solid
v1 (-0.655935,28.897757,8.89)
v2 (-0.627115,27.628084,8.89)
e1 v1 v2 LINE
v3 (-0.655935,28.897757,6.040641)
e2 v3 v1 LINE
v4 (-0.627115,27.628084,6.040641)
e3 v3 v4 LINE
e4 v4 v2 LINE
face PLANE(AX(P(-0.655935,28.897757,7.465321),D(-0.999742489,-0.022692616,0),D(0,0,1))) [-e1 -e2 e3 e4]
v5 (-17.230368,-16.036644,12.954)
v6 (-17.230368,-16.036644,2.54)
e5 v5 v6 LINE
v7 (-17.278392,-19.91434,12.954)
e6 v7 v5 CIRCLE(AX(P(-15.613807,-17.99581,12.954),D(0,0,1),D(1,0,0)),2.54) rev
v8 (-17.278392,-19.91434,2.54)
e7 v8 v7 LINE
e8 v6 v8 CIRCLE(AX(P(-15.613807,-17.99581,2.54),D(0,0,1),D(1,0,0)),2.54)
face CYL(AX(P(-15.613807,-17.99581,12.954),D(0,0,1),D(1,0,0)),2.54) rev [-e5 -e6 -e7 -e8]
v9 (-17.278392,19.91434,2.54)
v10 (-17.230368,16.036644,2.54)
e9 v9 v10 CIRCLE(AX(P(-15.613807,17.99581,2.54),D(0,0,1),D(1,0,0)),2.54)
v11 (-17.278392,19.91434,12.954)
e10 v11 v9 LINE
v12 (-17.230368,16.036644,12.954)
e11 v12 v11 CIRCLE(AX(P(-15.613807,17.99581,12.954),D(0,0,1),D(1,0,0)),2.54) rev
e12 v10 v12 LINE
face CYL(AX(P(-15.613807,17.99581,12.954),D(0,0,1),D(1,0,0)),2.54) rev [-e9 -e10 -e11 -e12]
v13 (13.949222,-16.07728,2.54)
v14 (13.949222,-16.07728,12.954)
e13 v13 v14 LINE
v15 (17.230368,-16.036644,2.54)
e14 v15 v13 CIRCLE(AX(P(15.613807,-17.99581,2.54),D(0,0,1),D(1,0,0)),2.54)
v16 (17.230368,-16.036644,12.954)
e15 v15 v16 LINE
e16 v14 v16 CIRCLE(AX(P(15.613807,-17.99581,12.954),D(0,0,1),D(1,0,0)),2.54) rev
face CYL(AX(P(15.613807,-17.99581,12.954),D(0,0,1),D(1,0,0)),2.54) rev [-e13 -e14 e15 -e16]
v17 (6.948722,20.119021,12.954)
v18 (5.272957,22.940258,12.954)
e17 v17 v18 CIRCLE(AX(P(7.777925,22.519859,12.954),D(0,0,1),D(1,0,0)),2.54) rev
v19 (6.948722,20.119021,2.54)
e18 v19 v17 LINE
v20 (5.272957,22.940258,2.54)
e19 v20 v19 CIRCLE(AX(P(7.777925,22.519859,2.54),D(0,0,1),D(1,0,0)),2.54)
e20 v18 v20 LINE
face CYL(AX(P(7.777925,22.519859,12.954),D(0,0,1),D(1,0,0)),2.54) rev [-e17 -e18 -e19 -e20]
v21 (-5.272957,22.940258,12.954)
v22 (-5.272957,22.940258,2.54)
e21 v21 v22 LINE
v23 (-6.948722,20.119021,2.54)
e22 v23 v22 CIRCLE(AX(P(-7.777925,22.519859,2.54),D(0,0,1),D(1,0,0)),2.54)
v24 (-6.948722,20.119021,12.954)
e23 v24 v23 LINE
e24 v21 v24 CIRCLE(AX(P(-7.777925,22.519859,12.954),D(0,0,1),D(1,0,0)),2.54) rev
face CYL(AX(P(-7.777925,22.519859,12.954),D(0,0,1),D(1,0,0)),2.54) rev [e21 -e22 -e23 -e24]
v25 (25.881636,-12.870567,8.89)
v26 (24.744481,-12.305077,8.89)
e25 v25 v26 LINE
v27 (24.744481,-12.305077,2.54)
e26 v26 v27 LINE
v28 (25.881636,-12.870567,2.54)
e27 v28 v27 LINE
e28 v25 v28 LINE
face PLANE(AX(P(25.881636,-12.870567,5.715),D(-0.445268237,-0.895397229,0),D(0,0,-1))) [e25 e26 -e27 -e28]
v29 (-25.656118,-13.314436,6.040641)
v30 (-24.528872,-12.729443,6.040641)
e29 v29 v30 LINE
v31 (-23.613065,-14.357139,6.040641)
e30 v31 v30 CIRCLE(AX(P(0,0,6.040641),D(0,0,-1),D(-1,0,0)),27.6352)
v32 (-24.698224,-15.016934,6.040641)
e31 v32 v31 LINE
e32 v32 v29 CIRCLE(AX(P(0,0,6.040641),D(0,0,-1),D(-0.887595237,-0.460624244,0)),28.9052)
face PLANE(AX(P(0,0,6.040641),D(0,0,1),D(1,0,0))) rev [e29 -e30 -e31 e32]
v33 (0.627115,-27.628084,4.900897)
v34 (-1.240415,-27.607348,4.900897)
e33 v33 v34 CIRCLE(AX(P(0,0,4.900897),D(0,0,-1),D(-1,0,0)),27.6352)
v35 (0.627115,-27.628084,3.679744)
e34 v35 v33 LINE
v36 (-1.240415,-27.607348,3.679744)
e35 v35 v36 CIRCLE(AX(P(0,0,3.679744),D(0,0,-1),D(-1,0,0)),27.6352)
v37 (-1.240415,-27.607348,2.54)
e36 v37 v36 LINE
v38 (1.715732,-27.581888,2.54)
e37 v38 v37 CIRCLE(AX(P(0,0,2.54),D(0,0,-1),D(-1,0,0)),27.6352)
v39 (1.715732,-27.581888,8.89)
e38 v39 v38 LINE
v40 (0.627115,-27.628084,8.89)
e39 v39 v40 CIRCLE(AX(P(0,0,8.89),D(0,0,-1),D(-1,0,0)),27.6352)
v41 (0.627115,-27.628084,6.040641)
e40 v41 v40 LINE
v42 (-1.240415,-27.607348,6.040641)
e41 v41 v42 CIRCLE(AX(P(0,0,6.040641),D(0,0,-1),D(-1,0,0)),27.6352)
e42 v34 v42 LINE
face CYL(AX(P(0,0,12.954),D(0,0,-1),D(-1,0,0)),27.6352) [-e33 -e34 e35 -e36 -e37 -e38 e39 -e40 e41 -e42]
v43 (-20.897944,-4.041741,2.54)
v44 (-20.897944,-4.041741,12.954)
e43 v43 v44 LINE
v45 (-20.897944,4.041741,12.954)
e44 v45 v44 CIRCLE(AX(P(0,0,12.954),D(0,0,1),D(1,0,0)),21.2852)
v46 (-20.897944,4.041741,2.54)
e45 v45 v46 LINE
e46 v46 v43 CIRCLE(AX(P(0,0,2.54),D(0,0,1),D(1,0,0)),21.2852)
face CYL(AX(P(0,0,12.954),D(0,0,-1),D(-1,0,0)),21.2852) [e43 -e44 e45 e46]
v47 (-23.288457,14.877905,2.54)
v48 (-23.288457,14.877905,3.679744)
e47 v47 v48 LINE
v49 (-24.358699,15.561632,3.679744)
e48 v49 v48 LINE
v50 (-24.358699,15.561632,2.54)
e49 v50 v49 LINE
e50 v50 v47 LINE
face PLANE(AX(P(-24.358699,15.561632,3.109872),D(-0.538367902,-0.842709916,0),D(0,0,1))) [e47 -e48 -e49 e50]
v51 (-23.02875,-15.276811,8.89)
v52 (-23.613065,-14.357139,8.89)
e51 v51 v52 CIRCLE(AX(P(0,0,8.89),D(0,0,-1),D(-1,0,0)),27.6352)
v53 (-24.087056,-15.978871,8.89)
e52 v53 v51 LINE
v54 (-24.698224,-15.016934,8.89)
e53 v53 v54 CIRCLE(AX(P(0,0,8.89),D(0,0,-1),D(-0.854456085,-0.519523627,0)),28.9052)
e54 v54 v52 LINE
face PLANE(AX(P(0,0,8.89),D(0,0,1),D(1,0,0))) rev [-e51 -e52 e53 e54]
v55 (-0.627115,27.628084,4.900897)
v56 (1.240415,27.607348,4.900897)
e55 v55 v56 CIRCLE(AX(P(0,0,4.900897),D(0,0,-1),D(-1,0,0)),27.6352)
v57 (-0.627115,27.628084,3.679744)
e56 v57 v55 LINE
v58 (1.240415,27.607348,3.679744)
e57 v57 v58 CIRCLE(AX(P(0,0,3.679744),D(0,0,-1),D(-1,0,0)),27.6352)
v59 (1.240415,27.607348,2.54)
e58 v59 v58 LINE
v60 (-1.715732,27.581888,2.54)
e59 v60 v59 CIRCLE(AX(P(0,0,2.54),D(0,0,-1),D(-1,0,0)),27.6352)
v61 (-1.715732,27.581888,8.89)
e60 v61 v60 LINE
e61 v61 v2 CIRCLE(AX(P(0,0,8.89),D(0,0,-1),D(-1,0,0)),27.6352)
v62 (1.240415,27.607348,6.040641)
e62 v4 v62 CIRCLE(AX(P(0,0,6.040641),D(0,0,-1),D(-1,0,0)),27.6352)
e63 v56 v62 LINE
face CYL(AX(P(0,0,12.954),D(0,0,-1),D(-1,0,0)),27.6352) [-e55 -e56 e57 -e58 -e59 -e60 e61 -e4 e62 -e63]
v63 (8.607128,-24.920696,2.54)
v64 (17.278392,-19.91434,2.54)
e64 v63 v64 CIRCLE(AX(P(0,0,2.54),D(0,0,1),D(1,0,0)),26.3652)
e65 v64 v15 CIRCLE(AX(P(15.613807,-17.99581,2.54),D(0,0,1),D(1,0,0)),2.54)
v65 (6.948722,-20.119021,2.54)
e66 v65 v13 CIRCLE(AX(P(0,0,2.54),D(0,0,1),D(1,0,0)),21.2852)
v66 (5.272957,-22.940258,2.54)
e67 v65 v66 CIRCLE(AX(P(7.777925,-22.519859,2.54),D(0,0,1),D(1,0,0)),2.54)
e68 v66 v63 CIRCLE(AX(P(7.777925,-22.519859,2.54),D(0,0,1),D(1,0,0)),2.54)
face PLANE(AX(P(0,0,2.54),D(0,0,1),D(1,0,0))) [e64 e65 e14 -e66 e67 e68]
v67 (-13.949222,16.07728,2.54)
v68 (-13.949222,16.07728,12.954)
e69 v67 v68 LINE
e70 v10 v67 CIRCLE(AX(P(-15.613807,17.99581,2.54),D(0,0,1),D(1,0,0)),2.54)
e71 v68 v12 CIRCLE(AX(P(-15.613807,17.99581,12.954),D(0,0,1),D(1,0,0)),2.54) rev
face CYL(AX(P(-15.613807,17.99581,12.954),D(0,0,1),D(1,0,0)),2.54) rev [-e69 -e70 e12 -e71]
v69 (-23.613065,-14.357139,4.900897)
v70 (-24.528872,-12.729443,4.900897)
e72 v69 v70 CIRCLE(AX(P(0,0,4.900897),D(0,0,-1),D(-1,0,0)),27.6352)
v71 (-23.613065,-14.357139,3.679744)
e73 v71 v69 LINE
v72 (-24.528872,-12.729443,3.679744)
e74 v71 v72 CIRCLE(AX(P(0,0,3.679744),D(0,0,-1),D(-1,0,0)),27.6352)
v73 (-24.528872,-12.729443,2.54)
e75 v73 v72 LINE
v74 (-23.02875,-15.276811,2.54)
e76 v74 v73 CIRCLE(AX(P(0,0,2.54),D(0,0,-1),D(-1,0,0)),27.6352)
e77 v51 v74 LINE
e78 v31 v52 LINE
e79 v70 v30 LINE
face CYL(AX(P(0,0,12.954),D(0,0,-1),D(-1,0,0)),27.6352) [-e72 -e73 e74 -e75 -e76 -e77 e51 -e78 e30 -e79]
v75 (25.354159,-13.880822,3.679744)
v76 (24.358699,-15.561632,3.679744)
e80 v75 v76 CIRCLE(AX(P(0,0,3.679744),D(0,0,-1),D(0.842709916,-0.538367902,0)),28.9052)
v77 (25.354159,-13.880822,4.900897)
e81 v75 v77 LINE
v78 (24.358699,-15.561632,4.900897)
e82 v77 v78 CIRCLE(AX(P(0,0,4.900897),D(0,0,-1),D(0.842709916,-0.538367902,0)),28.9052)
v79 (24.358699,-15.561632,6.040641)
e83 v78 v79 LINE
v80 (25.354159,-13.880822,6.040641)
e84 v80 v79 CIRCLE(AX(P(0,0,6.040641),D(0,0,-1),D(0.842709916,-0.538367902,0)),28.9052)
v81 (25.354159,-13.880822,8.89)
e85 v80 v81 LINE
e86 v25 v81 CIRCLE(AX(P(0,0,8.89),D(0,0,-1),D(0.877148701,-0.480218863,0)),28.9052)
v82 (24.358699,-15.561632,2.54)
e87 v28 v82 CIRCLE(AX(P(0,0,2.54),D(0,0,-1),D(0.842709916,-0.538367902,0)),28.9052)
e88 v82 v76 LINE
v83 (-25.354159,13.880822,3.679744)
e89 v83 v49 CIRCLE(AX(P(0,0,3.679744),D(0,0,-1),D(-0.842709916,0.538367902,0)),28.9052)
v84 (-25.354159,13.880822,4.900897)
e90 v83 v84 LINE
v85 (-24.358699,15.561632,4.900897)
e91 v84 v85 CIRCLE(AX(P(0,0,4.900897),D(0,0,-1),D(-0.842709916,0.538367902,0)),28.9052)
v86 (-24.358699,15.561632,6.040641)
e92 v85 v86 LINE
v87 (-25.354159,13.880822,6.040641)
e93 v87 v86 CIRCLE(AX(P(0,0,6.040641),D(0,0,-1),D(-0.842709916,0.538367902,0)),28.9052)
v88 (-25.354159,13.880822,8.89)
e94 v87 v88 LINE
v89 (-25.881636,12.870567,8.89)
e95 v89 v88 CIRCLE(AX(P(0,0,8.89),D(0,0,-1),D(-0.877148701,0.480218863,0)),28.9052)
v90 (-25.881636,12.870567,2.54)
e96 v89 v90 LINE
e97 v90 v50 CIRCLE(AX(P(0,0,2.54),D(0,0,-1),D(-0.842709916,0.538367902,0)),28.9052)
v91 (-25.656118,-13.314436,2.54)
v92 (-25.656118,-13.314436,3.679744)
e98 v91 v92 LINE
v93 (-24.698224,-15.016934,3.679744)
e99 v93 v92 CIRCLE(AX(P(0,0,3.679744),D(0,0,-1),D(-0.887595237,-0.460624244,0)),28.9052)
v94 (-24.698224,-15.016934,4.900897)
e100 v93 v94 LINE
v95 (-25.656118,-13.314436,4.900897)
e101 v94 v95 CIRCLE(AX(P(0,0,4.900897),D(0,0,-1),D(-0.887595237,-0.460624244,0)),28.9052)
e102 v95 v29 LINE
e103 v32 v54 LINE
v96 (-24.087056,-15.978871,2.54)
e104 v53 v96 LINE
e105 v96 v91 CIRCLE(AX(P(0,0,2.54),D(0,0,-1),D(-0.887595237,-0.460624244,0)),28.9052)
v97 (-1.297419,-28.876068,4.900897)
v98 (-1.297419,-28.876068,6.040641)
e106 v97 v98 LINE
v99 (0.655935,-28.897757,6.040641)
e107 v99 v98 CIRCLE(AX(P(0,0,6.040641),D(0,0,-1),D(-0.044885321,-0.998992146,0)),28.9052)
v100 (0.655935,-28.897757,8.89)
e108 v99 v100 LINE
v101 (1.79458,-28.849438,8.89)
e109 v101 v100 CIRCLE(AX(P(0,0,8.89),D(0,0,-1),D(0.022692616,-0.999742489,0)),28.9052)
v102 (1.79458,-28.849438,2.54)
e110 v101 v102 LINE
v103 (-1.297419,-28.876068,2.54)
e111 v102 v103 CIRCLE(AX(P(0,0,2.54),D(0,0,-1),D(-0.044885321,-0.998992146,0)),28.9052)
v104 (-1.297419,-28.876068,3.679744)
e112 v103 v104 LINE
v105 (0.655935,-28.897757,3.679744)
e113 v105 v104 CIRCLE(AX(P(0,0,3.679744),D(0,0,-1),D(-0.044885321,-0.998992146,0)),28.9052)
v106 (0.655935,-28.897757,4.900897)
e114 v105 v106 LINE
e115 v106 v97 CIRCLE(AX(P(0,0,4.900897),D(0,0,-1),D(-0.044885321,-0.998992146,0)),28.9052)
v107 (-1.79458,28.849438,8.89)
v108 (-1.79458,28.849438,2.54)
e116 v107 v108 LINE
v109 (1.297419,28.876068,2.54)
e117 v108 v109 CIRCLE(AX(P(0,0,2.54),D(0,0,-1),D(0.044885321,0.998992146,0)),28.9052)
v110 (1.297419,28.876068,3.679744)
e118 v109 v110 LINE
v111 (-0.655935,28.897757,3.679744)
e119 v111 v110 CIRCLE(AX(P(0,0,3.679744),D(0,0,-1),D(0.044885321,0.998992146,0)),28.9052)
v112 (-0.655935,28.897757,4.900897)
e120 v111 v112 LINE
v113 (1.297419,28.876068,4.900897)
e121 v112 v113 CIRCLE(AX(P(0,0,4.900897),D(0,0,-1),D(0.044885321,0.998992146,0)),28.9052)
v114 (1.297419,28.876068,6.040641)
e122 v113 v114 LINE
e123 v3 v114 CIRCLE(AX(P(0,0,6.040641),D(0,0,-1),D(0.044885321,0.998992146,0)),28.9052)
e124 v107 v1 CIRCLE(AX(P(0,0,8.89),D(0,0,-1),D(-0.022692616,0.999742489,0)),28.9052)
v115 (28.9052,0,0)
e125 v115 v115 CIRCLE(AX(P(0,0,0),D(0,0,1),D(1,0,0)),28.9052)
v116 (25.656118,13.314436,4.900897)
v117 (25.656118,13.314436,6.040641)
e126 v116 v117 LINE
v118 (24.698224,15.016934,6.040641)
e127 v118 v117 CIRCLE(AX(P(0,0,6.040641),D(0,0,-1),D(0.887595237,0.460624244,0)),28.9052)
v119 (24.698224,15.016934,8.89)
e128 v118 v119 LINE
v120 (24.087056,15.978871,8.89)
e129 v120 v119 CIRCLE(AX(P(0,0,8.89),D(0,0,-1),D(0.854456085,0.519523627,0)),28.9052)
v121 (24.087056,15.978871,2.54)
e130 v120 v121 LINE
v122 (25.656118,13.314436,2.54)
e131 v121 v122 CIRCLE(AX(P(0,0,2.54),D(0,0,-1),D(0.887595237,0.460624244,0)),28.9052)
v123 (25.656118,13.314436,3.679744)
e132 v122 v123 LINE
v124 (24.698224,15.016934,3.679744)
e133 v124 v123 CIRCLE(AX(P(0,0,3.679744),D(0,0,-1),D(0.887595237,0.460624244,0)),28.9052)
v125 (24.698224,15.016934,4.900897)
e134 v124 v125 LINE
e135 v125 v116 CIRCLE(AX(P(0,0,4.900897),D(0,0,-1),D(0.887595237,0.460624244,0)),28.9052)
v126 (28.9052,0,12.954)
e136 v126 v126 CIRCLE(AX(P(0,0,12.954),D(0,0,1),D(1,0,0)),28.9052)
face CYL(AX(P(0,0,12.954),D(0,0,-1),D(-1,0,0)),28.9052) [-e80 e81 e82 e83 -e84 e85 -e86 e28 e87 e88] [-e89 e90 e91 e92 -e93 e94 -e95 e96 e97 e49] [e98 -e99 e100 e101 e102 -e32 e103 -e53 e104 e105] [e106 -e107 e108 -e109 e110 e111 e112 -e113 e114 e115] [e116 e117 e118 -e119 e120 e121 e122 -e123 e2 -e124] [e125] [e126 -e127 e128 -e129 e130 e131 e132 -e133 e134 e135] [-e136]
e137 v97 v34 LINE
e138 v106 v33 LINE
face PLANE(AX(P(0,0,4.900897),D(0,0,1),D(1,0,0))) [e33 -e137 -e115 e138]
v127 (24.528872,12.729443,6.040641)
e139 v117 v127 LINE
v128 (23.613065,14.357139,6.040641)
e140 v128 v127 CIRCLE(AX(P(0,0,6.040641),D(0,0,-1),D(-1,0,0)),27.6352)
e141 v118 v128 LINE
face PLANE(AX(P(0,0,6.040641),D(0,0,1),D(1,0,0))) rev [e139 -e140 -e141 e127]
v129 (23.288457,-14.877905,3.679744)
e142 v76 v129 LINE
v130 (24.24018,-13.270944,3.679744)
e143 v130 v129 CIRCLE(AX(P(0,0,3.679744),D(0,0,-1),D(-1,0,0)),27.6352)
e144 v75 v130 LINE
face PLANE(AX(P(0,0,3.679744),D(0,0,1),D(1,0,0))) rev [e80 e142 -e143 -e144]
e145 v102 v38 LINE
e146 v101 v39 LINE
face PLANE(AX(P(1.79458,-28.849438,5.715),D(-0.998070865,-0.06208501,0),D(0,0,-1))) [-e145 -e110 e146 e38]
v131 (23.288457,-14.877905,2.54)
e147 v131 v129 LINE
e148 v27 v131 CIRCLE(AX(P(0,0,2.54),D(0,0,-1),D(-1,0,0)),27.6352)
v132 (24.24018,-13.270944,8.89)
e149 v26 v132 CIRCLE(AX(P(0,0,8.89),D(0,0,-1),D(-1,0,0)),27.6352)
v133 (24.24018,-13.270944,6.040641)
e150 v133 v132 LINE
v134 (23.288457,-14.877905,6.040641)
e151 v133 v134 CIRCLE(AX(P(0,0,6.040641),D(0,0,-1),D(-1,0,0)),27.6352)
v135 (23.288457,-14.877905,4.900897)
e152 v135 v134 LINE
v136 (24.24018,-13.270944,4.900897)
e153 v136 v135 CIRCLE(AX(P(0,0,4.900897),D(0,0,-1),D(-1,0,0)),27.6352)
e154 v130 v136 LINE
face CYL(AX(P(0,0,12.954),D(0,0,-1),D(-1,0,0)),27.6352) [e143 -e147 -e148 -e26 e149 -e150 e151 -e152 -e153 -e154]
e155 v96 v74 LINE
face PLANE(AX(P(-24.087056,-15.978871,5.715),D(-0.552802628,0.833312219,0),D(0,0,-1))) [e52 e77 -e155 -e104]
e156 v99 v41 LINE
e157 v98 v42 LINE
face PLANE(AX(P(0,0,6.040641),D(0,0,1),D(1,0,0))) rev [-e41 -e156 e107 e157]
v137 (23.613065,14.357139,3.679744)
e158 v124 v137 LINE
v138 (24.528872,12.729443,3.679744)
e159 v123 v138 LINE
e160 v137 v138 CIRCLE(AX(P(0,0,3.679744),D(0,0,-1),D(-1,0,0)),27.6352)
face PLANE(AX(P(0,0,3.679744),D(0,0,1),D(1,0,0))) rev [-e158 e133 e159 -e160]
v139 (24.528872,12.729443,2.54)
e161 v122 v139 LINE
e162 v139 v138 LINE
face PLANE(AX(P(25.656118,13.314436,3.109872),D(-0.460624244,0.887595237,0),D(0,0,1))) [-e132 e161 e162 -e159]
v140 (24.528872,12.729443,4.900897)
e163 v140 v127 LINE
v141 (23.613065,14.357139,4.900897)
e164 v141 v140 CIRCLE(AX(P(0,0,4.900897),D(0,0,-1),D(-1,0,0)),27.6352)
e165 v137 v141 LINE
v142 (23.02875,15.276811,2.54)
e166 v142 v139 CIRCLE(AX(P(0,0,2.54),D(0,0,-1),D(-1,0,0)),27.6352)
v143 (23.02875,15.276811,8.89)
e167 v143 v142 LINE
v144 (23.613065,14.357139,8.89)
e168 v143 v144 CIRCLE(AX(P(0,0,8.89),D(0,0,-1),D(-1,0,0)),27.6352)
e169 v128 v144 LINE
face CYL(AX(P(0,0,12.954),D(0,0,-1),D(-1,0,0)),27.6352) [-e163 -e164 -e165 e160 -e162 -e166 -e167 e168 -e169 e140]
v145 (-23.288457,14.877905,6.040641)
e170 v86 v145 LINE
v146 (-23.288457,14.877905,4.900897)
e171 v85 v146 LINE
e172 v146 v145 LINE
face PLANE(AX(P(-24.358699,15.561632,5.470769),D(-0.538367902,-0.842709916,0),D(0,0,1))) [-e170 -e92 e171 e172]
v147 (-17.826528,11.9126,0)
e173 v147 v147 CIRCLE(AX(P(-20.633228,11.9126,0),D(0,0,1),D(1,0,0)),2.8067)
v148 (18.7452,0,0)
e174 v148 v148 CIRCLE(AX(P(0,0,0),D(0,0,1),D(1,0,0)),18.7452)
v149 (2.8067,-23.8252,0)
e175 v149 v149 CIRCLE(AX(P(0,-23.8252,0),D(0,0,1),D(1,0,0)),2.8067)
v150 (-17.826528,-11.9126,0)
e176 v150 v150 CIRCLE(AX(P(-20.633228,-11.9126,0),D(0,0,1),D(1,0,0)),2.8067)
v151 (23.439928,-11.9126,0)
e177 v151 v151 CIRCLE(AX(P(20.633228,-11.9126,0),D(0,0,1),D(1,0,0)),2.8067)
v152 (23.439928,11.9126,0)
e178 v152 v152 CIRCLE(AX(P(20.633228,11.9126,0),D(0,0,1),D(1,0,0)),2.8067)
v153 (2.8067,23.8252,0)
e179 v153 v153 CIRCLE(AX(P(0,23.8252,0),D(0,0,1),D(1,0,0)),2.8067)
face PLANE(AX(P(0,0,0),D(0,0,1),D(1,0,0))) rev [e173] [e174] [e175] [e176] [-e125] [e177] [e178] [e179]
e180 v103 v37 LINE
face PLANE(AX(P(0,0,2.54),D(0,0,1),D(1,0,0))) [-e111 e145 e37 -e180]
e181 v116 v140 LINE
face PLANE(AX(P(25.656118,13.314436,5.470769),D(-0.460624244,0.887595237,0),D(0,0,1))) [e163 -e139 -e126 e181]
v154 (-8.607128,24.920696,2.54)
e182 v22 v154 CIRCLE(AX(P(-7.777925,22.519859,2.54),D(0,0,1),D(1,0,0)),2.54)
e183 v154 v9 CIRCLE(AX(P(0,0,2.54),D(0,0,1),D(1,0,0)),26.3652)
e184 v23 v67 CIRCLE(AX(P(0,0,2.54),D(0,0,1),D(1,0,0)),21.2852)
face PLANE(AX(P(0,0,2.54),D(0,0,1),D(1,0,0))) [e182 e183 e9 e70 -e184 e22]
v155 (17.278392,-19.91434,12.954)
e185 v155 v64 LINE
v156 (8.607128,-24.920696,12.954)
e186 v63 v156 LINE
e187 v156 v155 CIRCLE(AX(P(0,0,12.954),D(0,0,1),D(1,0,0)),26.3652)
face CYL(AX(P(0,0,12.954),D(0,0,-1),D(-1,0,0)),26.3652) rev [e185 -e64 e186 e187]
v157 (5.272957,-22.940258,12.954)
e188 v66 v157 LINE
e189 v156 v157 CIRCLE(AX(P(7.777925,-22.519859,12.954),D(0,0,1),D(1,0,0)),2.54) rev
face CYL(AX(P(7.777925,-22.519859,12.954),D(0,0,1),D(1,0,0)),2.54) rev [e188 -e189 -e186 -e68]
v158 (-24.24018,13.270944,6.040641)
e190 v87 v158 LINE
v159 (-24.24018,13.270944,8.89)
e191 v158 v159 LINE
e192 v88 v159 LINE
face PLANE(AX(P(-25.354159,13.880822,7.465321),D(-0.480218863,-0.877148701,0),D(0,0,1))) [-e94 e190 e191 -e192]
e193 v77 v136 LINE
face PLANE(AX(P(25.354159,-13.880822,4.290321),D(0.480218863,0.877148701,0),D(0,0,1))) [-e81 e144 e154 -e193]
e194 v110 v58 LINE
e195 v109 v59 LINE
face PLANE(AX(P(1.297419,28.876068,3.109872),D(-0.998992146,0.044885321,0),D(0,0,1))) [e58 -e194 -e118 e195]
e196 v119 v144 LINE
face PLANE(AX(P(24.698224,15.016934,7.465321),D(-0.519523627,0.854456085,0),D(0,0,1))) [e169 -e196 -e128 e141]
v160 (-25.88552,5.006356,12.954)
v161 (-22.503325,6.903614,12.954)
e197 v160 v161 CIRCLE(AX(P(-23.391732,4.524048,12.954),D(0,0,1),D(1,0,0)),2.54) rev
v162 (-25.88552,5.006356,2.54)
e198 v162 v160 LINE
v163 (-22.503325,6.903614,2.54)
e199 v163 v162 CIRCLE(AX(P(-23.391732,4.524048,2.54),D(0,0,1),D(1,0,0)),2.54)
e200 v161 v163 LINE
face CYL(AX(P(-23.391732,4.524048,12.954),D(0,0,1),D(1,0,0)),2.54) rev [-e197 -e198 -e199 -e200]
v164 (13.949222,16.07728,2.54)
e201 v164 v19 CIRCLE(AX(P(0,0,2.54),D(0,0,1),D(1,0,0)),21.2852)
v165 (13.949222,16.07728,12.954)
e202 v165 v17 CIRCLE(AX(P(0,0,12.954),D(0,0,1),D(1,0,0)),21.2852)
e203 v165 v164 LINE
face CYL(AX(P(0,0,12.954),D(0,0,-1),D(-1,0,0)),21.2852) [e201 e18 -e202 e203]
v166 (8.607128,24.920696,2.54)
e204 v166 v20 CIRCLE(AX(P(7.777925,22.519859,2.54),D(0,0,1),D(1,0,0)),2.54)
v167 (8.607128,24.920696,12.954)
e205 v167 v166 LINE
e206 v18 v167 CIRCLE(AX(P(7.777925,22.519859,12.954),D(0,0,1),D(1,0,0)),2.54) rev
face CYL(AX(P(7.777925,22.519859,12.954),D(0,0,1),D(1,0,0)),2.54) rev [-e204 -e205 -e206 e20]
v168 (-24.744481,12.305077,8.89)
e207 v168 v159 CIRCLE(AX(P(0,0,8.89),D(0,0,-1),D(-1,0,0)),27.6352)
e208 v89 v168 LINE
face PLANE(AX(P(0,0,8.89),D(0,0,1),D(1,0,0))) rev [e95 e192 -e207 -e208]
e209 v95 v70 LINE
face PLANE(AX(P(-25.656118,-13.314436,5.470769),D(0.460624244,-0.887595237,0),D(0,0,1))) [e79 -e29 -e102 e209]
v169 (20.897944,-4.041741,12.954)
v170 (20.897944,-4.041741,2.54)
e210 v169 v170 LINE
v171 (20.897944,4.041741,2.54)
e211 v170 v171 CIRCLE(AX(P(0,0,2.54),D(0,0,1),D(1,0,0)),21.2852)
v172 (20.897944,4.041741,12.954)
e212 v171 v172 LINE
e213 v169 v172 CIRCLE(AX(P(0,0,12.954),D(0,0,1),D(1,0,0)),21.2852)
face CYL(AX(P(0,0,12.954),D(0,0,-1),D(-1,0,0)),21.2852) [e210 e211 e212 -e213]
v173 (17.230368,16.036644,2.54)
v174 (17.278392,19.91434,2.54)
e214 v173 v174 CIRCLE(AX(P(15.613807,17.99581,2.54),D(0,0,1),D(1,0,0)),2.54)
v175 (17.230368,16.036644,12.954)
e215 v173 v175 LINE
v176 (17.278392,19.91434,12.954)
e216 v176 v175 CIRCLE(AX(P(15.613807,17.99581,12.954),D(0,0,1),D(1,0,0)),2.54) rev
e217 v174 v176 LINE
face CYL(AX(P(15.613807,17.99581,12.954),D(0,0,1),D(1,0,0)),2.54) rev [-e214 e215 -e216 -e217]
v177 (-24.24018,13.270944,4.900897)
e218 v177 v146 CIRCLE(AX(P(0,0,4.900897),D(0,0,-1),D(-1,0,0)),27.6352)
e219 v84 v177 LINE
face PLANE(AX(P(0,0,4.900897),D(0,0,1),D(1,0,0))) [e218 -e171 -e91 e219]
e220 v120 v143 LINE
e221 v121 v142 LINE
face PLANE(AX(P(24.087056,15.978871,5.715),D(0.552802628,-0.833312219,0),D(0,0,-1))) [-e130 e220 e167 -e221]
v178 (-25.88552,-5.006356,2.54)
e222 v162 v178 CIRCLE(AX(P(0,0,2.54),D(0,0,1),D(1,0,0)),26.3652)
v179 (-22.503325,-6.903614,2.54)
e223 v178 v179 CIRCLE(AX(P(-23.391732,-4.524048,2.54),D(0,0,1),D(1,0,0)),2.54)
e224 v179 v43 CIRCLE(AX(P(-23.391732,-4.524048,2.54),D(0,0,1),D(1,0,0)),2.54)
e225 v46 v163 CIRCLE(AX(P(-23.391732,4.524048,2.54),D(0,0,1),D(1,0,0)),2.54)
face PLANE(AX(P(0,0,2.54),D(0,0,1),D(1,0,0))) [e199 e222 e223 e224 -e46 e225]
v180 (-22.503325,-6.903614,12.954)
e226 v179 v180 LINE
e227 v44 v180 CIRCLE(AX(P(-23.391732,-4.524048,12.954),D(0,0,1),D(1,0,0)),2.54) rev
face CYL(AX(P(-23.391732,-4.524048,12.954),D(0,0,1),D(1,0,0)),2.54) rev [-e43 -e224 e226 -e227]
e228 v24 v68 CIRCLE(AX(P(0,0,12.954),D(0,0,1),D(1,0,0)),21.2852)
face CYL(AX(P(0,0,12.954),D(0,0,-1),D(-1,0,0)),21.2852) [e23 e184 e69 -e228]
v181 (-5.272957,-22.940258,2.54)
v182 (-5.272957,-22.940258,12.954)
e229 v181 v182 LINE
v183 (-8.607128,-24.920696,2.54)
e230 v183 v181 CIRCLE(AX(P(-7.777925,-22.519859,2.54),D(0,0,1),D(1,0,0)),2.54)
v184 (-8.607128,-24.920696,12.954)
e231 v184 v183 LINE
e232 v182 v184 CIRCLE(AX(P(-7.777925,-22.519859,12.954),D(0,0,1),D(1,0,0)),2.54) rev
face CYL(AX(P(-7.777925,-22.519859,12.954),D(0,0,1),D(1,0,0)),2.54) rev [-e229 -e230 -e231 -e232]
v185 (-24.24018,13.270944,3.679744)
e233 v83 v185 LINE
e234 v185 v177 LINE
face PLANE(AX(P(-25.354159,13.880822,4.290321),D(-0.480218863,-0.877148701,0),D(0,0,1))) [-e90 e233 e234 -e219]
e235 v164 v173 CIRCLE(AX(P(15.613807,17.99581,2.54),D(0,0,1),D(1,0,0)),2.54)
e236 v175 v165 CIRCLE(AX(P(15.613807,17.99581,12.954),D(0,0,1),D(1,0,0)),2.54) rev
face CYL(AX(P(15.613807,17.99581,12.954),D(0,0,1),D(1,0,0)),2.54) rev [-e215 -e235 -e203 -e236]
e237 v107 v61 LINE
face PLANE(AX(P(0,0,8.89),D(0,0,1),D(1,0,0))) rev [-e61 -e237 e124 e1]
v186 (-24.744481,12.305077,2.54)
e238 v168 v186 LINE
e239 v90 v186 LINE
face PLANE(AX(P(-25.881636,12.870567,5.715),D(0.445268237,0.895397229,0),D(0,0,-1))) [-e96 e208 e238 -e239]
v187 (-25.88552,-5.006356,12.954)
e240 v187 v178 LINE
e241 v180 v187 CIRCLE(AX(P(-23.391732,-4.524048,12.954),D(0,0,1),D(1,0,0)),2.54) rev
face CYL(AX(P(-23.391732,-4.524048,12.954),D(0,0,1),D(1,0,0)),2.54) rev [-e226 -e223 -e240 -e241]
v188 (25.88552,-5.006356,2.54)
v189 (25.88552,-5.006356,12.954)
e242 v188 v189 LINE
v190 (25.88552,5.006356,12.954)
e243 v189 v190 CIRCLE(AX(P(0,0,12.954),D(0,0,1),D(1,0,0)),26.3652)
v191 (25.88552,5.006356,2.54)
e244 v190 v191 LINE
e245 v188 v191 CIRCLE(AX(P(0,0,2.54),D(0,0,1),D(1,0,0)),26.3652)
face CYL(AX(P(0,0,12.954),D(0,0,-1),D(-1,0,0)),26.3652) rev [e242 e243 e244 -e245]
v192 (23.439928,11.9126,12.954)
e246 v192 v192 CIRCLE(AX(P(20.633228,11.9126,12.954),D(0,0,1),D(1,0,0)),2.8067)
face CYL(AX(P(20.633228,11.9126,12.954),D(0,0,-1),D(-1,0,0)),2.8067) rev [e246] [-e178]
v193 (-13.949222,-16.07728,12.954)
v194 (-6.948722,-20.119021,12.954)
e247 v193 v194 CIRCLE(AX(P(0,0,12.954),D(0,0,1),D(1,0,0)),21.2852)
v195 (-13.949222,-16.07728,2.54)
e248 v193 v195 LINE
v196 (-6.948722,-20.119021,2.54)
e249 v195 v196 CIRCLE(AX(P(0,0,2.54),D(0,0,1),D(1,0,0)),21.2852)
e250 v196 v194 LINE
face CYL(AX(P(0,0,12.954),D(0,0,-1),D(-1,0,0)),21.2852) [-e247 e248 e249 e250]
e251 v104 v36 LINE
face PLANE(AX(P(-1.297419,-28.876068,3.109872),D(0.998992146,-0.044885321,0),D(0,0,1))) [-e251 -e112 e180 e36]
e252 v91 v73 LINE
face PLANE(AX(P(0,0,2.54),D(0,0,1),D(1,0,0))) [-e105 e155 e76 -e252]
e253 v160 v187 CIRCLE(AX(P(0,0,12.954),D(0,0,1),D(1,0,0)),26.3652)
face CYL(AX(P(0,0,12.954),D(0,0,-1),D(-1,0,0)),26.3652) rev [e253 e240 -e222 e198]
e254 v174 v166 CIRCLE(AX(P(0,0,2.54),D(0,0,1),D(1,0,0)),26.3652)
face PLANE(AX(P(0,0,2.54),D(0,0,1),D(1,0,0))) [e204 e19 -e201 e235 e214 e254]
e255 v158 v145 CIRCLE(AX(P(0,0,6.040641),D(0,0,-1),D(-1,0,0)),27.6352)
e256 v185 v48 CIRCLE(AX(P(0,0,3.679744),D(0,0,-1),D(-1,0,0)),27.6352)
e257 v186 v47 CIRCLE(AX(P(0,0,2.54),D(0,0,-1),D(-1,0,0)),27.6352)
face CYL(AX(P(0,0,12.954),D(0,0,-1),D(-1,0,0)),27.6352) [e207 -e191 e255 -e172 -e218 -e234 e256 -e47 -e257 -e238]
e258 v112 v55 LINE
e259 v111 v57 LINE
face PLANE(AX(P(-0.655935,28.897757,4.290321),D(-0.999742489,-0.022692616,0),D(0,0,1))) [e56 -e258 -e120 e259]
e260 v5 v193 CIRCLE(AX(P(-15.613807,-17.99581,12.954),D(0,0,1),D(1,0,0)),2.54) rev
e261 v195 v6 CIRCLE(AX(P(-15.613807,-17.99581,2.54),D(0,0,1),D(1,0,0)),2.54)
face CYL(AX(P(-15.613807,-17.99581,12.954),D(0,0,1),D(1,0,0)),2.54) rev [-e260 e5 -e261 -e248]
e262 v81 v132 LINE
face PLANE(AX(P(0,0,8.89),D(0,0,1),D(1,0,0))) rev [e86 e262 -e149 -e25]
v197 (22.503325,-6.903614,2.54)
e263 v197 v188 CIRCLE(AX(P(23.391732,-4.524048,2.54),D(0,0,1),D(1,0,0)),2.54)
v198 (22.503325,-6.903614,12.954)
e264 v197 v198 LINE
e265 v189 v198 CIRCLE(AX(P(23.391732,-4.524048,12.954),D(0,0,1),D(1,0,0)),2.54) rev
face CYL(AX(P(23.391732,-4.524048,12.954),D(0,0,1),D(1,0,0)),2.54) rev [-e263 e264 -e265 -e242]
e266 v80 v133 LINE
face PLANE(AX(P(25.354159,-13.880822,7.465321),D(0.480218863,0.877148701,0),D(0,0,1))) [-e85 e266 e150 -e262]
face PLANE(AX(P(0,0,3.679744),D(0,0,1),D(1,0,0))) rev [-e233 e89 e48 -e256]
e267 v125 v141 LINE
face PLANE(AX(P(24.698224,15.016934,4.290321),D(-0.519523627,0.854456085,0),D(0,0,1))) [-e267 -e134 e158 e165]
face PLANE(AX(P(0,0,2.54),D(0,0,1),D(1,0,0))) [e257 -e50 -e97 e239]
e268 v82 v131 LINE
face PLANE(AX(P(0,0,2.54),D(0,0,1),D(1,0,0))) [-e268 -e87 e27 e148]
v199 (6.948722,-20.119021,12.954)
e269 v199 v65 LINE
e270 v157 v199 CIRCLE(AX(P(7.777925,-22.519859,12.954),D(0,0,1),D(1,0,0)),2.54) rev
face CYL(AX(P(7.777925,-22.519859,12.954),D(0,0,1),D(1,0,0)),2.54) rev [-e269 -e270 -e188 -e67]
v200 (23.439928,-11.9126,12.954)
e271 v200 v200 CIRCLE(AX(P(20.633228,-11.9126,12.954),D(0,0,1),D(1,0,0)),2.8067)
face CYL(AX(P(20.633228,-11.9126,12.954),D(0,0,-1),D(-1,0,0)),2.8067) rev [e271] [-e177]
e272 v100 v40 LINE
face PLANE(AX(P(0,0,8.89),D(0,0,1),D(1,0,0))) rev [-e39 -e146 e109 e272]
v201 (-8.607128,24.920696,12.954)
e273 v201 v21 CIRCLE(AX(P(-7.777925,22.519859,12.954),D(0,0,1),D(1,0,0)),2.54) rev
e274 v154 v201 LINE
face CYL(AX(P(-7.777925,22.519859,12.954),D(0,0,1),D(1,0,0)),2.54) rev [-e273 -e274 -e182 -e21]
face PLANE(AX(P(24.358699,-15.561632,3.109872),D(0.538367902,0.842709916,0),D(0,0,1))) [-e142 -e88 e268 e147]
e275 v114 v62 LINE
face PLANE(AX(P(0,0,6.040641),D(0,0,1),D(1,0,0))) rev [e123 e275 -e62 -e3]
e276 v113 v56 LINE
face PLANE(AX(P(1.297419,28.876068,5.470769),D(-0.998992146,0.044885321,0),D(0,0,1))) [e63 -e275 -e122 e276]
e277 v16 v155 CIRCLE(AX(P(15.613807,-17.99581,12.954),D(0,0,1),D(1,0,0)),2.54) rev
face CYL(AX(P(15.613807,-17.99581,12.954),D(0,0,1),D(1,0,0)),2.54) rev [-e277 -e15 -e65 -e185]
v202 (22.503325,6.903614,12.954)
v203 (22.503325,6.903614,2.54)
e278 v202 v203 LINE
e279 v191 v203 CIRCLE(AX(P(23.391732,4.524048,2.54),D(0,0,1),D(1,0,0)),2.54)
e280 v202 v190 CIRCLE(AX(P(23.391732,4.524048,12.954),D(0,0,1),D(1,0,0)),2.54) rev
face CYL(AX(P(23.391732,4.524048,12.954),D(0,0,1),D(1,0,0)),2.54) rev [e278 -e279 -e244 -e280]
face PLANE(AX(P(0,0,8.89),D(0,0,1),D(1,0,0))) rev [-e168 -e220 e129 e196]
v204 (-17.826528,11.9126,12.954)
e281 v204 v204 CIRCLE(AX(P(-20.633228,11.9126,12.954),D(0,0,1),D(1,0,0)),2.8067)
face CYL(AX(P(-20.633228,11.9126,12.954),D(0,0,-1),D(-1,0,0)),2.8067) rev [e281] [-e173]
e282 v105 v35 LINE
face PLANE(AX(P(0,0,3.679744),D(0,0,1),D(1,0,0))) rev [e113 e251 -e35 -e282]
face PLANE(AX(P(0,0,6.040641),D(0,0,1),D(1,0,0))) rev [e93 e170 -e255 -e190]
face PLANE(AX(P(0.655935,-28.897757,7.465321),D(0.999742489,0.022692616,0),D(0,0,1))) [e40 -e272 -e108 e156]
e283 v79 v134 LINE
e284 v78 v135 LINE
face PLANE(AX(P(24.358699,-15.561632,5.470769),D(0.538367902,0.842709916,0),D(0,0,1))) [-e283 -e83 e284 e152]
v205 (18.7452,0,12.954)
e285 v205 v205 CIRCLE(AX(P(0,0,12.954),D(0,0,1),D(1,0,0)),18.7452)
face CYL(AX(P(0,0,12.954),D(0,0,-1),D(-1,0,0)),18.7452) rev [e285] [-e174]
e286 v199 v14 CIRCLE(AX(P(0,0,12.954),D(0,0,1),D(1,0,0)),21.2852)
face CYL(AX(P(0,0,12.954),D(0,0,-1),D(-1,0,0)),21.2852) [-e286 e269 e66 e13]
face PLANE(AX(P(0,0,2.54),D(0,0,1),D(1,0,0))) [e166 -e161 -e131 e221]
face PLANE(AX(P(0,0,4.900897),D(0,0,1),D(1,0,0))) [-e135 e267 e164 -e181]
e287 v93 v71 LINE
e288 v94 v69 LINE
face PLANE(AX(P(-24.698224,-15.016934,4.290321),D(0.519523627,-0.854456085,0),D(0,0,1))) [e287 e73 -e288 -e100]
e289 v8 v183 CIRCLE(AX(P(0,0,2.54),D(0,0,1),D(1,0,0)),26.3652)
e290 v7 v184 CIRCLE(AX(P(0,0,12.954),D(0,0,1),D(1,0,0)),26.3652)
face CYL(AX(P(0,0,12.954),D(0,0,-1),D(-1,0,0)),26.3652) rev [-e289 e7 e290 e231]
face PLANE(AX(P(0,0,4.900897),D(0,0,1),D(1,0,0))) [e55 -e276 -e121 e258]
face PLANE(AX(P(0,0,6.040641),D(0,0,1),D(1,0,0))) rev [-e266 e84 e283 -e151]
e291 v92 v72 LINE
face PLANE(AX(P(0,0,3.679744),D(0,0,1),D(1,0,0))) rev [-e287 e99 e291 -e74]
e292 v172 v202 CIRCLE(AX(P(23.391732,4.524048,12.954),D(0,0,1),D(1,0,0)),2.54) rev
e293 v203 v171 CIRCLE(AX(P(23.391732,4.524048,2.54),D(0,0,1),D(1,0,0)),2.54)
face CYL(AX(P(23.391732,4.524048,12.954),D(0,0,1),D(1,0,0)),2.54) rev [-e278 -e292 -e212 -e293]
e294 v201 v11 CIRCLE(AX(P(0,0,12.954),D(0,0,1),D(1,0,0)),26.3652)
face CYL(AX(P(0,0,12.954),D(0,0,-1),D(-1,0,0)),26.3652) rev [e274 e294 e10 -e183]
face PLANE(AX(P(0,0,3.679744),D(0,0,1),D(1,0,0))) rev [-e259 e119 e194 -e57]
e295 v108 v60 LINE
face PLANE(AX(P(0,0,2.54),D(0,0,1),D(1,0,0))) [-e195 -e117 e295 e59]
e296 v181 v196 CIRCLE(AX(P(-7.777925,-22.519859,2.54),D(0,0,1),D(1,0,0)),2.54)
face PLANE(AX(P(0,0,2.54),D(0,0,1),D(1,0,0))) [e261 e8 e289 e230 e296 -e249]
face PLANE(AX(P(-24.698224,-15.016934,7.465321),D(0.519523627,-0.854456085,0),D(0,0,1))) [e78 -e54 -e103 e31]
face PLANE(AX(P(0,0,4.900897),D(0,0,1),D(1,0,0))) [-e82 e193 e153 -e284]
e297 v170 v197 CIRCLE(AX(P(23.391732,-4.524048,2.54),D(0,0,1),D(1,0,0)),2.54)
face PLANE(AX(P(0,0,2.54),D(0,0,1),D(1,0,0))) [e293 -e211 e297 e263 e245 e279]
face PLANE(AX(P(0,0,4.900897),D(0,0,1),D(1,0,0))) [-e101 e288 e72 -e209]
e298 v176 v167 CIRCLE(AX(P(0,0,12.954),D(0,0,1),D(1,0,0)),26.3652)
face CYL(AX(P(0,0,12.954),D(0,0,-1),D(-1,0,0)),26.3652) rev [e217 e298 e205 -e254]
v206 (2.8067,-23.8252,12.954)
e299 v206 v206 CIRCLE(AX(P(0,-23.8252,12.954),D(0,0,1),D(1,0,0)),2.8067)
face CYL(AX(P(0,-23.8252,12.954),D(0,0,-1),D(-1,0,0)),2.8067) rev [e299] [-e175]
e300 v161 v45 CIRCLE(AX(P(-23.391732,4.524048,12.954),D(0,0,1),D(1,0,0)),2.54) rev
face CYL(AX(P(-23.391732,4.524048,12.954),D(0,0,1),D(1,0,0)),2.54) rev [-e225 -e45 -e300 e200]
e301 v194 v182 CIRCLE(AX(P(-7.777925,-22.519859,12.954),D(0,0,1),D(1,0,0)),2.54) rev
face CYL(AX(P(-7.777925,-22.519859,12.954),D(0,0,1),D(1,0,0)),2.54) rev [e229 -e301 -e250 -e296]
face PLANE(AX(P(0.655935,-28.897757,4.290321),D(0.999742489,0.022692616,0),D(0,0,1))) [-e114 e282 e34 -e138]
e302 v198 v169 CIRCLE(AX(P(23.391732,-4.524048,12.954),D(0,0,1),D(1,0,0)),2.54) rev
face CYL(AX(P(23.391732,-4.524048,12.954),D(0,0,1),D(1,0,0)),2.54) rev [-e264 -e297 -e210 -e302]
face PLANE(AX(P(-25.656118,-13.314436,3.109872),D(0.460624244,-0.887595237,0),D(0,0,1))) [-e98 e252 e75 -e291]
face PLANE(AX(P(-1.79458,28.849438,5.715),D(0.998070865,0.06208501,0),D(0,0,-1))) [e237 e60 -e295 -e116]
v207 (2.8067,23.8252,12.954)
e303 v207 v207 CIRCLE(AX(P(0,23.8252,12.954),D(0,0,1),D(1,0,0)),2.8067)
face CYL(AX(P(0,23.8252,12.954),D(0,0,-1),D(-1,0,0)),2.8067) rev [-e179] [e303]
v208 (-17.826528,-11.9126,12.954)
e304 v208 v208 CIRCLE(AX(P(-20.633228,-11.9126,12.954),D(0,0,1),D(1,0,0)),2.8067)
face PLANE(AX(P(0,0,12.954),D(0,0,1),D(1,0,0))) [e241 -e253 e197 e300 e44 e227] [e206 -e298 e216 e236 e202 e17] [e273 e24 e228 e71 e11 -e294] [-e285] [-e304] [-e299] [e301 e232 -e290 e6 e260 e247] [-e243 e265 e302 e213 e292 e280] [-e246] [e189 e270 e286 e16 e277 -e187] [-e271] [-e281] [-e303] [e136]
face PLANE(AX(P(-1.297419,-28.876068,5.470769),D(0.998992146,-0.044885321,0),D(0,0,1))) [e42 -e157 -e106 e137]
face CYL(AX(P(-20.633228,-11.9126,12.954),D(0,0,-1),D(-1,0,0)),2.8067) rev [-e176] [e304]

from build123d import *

# Parameters (mm, degrees)
SKETCH1_R           = 28.9052
SKETCH1_R_2         = 2.8067
SKETCH1_R_3         = 18.7452
BOSS_EXTRUDE1_DEPTH = 12.954
SHELL1_T            = -2.54
FILLET1_R           = 2.54
WRAP1_START         = 2.54
WRAP1_DEPTH         = 6.35
WRAP1_2_DEPTH       = 1.13974359
WRAP1_START_2       = 4.900897436
WRAP1_3_DEPTH       = 1.13974359
CIRPATTERN3_COUNT   = 6


# Read off the part's stored shape, not the designer's step: Wrap1
with BuildPart() as part:
    # Sketch1 → Boss-Extrude1 (new body)
    with BuildSketch(Plane.XY):
        Circle(SKETCH1_R)
        with Locations((0, 23.8252)):
            Circle(SKETCH1_R_2, mode=Mode.SUBTRACT)
        with Locations((20.63322845, 11.9126)):
            Circle(SKETCH1_R_2, mode=Mode.SUBTRACT)
        with Locations((20.63322845, -11.9126)):
            Circle(SKETCH1_R_2, mode=Mode.SUBTRACT)
        with Locations((0, -23.8252)):
            Circle(SKETCH1_R_2, mode=Mode.SUBTRACT)
        with Locations((-20.63322845, -11.9126)):
            Circle(SKETCH1_R_2, mode=Mode.SUBTRACT)
        with Locations((-20.63322845, 11.9126)):
            Circle(SKETCH1_R_2, mode=Mode.SUBTRACT)
        Circle(SKETCH1_R_3, mode=Mode.SUBTRACT)
    extrude(amount=BOSS_EXTRUDE1_DEPTH)

    # Shell1
    shell1_openings = [part.faces().sort_by_distance(p)[0] for p in [
        (-28.087637483, 0, 12.954),
    ]]
    offset(amount=SHELL1_T, openings=shell1_openings)

    # Fillet1
    fillet1_edges = [part.edges().sort_by_distance(p)[0] for p in [
        (4.422660927, 20.820658236, 7.747),
        (-4.422660927, 20.820658236, 7.747),
        (4.927440918, 25.900658236, 7.747),
        (-4.927440918, 25.900658236, 7.747),
        (-20.242549419, 6.580192403, 7.747),
        (-15.819888492, 14.240465833, 7.747),
        (-24.894348466, 8.683040107, 7.747),
        (-19.966907548, 17.217618129, 7.747),
        (19.966907548, 17.217618129, 7.747),
        (24.894348466, 8.683040107, 7.747),
        (15.819888492, 14.240465833, 7.747),
        (20.242549419, 6.580192403, 7.747),
        (19.966907548, -17.217618129, 7.747),
        (24.894348466, -8.683040107, 7.747),
        (15.819888492, -14.240465833, 7.747),
        (20.242549419, -6.580192403, 7.747),
        (-4.927440918, -25.900658236, 7.747),
        (4.927440918, -25.900658236, 7.747),
        (-4.422660927, -20.820658236, 7.747),
        (4.422660927, -20.820658236, 7.747),
        (-15.819888492, -14.240465833, 7.747),
        (-20.242549419, -6.580192403, 7.747),
        (-19.966907548, -17.217618129, 7.747),
        (-24.894348466, -8.683040107, 7.747),
    ]]
    fillet(fillet1_edges, radius=FILLET1_R - 0.0001)  # a hair under: the kernel refuses the full size

    # Wrap1 outline → Wrap1 (cut)
    with BuildSketch(Plane.XY.offset(WRAP1_START)):
        with BuildLine():
            Line((-0.627114985, 27.628083644), (-0.655934608, 28.897756605))
            ThreePointArc((-0.655934608, 28.897756605), (-1.225495275, 28.879209622), (-1.79457962, 28.849437967))
            Line((-1.79457962, 28.849437967), (-1.715731658, 27.581887969))
            ThreePointArc((-1.715731658, 27.581887969), (-1.171651018, 27.610351554), (-0.627114985, 27.628083644))
        make_face()
    wrap1 = extrude(amount=WRAP1_DEPTH, mode=Mode.SUBTRACT)

    # Wrap1 2 outline → Wrap1 2 (cut)
    with BuildSketch(Plane.XY.offset(WRAP1_START)):
        with BuildLine():
            Line((1.240414833, 27.607347755), (1.297419192, 28.876067781))
            ThreePointArc((1.297419192, 28.876067781), (0.320925566, 28.903418376), (-0.655934608, 28.897756605))
            Line((-0.655934608, 28.897756605), (-0.627114985, 27.628083644))
            ThreePointArc((-0.627114985, 27.628083644), (0.306825146, 27.633496654), (1.240414833, 27.607347755))
        make_face()
    wrap1_2 = extrude(amount=WRAP1_2_DEPTH, mode=Mode.SUBTRACT)

    # Wrap1 3 outline → Wrap1 3 (cut)
    with BuildSketch(Plane.XY.offset(WRAP1_START_2)):
        with BuildLine():
            Line((1.240414833, 27.607347755), (1.297419192, 28.876067781))
            ThreePointArc((1.297419192, 28.876067781), (0.320925566, 28.903418376), (-0.655934608, 28.897756605))
            Line((-0.655934608, 28.897756605), (-0.627114985, 27.628083644))
            ThreePointArc((-0.627114985, 27.628083644), (0.306825146, 27.633496654), (1.240414833, 27.607347755))
        make_face()
    wrap1_3 = extrude(amount=WRAP1_3_DEPTH, mode=Mode.SUBTRACT)

    # CirPattern3: Wrap1, Wrap1 2, Wrap1 3 ×6 about axis
    cirpattern3_axis = Axis((0, 0, 0), (0, 0, 1))
    add([wrap1.rotate(cirpattern3_axis, i * 360 / CIRPATTERN3_COUNT) for i in range(1, CIRPATTERN3_COUNT)], mode=Mode.SUBTRACT)
    add([wrap1_2.rotate(cirpattern3_axis, i * 360 / CIRPATTERN3_COUNT) for i in range(1, CIRPATTERN3_COUNT)], mode=Mode.SUBTRACT)
    add([wrap1_3.rotate(cirpattern3_axis, i * 360 / CIRPATTERN3_COUNT) for i in range(1, CIRPATTERN3_COUNT)], mode=Mode.SUBTRACT)


solid = part.part
